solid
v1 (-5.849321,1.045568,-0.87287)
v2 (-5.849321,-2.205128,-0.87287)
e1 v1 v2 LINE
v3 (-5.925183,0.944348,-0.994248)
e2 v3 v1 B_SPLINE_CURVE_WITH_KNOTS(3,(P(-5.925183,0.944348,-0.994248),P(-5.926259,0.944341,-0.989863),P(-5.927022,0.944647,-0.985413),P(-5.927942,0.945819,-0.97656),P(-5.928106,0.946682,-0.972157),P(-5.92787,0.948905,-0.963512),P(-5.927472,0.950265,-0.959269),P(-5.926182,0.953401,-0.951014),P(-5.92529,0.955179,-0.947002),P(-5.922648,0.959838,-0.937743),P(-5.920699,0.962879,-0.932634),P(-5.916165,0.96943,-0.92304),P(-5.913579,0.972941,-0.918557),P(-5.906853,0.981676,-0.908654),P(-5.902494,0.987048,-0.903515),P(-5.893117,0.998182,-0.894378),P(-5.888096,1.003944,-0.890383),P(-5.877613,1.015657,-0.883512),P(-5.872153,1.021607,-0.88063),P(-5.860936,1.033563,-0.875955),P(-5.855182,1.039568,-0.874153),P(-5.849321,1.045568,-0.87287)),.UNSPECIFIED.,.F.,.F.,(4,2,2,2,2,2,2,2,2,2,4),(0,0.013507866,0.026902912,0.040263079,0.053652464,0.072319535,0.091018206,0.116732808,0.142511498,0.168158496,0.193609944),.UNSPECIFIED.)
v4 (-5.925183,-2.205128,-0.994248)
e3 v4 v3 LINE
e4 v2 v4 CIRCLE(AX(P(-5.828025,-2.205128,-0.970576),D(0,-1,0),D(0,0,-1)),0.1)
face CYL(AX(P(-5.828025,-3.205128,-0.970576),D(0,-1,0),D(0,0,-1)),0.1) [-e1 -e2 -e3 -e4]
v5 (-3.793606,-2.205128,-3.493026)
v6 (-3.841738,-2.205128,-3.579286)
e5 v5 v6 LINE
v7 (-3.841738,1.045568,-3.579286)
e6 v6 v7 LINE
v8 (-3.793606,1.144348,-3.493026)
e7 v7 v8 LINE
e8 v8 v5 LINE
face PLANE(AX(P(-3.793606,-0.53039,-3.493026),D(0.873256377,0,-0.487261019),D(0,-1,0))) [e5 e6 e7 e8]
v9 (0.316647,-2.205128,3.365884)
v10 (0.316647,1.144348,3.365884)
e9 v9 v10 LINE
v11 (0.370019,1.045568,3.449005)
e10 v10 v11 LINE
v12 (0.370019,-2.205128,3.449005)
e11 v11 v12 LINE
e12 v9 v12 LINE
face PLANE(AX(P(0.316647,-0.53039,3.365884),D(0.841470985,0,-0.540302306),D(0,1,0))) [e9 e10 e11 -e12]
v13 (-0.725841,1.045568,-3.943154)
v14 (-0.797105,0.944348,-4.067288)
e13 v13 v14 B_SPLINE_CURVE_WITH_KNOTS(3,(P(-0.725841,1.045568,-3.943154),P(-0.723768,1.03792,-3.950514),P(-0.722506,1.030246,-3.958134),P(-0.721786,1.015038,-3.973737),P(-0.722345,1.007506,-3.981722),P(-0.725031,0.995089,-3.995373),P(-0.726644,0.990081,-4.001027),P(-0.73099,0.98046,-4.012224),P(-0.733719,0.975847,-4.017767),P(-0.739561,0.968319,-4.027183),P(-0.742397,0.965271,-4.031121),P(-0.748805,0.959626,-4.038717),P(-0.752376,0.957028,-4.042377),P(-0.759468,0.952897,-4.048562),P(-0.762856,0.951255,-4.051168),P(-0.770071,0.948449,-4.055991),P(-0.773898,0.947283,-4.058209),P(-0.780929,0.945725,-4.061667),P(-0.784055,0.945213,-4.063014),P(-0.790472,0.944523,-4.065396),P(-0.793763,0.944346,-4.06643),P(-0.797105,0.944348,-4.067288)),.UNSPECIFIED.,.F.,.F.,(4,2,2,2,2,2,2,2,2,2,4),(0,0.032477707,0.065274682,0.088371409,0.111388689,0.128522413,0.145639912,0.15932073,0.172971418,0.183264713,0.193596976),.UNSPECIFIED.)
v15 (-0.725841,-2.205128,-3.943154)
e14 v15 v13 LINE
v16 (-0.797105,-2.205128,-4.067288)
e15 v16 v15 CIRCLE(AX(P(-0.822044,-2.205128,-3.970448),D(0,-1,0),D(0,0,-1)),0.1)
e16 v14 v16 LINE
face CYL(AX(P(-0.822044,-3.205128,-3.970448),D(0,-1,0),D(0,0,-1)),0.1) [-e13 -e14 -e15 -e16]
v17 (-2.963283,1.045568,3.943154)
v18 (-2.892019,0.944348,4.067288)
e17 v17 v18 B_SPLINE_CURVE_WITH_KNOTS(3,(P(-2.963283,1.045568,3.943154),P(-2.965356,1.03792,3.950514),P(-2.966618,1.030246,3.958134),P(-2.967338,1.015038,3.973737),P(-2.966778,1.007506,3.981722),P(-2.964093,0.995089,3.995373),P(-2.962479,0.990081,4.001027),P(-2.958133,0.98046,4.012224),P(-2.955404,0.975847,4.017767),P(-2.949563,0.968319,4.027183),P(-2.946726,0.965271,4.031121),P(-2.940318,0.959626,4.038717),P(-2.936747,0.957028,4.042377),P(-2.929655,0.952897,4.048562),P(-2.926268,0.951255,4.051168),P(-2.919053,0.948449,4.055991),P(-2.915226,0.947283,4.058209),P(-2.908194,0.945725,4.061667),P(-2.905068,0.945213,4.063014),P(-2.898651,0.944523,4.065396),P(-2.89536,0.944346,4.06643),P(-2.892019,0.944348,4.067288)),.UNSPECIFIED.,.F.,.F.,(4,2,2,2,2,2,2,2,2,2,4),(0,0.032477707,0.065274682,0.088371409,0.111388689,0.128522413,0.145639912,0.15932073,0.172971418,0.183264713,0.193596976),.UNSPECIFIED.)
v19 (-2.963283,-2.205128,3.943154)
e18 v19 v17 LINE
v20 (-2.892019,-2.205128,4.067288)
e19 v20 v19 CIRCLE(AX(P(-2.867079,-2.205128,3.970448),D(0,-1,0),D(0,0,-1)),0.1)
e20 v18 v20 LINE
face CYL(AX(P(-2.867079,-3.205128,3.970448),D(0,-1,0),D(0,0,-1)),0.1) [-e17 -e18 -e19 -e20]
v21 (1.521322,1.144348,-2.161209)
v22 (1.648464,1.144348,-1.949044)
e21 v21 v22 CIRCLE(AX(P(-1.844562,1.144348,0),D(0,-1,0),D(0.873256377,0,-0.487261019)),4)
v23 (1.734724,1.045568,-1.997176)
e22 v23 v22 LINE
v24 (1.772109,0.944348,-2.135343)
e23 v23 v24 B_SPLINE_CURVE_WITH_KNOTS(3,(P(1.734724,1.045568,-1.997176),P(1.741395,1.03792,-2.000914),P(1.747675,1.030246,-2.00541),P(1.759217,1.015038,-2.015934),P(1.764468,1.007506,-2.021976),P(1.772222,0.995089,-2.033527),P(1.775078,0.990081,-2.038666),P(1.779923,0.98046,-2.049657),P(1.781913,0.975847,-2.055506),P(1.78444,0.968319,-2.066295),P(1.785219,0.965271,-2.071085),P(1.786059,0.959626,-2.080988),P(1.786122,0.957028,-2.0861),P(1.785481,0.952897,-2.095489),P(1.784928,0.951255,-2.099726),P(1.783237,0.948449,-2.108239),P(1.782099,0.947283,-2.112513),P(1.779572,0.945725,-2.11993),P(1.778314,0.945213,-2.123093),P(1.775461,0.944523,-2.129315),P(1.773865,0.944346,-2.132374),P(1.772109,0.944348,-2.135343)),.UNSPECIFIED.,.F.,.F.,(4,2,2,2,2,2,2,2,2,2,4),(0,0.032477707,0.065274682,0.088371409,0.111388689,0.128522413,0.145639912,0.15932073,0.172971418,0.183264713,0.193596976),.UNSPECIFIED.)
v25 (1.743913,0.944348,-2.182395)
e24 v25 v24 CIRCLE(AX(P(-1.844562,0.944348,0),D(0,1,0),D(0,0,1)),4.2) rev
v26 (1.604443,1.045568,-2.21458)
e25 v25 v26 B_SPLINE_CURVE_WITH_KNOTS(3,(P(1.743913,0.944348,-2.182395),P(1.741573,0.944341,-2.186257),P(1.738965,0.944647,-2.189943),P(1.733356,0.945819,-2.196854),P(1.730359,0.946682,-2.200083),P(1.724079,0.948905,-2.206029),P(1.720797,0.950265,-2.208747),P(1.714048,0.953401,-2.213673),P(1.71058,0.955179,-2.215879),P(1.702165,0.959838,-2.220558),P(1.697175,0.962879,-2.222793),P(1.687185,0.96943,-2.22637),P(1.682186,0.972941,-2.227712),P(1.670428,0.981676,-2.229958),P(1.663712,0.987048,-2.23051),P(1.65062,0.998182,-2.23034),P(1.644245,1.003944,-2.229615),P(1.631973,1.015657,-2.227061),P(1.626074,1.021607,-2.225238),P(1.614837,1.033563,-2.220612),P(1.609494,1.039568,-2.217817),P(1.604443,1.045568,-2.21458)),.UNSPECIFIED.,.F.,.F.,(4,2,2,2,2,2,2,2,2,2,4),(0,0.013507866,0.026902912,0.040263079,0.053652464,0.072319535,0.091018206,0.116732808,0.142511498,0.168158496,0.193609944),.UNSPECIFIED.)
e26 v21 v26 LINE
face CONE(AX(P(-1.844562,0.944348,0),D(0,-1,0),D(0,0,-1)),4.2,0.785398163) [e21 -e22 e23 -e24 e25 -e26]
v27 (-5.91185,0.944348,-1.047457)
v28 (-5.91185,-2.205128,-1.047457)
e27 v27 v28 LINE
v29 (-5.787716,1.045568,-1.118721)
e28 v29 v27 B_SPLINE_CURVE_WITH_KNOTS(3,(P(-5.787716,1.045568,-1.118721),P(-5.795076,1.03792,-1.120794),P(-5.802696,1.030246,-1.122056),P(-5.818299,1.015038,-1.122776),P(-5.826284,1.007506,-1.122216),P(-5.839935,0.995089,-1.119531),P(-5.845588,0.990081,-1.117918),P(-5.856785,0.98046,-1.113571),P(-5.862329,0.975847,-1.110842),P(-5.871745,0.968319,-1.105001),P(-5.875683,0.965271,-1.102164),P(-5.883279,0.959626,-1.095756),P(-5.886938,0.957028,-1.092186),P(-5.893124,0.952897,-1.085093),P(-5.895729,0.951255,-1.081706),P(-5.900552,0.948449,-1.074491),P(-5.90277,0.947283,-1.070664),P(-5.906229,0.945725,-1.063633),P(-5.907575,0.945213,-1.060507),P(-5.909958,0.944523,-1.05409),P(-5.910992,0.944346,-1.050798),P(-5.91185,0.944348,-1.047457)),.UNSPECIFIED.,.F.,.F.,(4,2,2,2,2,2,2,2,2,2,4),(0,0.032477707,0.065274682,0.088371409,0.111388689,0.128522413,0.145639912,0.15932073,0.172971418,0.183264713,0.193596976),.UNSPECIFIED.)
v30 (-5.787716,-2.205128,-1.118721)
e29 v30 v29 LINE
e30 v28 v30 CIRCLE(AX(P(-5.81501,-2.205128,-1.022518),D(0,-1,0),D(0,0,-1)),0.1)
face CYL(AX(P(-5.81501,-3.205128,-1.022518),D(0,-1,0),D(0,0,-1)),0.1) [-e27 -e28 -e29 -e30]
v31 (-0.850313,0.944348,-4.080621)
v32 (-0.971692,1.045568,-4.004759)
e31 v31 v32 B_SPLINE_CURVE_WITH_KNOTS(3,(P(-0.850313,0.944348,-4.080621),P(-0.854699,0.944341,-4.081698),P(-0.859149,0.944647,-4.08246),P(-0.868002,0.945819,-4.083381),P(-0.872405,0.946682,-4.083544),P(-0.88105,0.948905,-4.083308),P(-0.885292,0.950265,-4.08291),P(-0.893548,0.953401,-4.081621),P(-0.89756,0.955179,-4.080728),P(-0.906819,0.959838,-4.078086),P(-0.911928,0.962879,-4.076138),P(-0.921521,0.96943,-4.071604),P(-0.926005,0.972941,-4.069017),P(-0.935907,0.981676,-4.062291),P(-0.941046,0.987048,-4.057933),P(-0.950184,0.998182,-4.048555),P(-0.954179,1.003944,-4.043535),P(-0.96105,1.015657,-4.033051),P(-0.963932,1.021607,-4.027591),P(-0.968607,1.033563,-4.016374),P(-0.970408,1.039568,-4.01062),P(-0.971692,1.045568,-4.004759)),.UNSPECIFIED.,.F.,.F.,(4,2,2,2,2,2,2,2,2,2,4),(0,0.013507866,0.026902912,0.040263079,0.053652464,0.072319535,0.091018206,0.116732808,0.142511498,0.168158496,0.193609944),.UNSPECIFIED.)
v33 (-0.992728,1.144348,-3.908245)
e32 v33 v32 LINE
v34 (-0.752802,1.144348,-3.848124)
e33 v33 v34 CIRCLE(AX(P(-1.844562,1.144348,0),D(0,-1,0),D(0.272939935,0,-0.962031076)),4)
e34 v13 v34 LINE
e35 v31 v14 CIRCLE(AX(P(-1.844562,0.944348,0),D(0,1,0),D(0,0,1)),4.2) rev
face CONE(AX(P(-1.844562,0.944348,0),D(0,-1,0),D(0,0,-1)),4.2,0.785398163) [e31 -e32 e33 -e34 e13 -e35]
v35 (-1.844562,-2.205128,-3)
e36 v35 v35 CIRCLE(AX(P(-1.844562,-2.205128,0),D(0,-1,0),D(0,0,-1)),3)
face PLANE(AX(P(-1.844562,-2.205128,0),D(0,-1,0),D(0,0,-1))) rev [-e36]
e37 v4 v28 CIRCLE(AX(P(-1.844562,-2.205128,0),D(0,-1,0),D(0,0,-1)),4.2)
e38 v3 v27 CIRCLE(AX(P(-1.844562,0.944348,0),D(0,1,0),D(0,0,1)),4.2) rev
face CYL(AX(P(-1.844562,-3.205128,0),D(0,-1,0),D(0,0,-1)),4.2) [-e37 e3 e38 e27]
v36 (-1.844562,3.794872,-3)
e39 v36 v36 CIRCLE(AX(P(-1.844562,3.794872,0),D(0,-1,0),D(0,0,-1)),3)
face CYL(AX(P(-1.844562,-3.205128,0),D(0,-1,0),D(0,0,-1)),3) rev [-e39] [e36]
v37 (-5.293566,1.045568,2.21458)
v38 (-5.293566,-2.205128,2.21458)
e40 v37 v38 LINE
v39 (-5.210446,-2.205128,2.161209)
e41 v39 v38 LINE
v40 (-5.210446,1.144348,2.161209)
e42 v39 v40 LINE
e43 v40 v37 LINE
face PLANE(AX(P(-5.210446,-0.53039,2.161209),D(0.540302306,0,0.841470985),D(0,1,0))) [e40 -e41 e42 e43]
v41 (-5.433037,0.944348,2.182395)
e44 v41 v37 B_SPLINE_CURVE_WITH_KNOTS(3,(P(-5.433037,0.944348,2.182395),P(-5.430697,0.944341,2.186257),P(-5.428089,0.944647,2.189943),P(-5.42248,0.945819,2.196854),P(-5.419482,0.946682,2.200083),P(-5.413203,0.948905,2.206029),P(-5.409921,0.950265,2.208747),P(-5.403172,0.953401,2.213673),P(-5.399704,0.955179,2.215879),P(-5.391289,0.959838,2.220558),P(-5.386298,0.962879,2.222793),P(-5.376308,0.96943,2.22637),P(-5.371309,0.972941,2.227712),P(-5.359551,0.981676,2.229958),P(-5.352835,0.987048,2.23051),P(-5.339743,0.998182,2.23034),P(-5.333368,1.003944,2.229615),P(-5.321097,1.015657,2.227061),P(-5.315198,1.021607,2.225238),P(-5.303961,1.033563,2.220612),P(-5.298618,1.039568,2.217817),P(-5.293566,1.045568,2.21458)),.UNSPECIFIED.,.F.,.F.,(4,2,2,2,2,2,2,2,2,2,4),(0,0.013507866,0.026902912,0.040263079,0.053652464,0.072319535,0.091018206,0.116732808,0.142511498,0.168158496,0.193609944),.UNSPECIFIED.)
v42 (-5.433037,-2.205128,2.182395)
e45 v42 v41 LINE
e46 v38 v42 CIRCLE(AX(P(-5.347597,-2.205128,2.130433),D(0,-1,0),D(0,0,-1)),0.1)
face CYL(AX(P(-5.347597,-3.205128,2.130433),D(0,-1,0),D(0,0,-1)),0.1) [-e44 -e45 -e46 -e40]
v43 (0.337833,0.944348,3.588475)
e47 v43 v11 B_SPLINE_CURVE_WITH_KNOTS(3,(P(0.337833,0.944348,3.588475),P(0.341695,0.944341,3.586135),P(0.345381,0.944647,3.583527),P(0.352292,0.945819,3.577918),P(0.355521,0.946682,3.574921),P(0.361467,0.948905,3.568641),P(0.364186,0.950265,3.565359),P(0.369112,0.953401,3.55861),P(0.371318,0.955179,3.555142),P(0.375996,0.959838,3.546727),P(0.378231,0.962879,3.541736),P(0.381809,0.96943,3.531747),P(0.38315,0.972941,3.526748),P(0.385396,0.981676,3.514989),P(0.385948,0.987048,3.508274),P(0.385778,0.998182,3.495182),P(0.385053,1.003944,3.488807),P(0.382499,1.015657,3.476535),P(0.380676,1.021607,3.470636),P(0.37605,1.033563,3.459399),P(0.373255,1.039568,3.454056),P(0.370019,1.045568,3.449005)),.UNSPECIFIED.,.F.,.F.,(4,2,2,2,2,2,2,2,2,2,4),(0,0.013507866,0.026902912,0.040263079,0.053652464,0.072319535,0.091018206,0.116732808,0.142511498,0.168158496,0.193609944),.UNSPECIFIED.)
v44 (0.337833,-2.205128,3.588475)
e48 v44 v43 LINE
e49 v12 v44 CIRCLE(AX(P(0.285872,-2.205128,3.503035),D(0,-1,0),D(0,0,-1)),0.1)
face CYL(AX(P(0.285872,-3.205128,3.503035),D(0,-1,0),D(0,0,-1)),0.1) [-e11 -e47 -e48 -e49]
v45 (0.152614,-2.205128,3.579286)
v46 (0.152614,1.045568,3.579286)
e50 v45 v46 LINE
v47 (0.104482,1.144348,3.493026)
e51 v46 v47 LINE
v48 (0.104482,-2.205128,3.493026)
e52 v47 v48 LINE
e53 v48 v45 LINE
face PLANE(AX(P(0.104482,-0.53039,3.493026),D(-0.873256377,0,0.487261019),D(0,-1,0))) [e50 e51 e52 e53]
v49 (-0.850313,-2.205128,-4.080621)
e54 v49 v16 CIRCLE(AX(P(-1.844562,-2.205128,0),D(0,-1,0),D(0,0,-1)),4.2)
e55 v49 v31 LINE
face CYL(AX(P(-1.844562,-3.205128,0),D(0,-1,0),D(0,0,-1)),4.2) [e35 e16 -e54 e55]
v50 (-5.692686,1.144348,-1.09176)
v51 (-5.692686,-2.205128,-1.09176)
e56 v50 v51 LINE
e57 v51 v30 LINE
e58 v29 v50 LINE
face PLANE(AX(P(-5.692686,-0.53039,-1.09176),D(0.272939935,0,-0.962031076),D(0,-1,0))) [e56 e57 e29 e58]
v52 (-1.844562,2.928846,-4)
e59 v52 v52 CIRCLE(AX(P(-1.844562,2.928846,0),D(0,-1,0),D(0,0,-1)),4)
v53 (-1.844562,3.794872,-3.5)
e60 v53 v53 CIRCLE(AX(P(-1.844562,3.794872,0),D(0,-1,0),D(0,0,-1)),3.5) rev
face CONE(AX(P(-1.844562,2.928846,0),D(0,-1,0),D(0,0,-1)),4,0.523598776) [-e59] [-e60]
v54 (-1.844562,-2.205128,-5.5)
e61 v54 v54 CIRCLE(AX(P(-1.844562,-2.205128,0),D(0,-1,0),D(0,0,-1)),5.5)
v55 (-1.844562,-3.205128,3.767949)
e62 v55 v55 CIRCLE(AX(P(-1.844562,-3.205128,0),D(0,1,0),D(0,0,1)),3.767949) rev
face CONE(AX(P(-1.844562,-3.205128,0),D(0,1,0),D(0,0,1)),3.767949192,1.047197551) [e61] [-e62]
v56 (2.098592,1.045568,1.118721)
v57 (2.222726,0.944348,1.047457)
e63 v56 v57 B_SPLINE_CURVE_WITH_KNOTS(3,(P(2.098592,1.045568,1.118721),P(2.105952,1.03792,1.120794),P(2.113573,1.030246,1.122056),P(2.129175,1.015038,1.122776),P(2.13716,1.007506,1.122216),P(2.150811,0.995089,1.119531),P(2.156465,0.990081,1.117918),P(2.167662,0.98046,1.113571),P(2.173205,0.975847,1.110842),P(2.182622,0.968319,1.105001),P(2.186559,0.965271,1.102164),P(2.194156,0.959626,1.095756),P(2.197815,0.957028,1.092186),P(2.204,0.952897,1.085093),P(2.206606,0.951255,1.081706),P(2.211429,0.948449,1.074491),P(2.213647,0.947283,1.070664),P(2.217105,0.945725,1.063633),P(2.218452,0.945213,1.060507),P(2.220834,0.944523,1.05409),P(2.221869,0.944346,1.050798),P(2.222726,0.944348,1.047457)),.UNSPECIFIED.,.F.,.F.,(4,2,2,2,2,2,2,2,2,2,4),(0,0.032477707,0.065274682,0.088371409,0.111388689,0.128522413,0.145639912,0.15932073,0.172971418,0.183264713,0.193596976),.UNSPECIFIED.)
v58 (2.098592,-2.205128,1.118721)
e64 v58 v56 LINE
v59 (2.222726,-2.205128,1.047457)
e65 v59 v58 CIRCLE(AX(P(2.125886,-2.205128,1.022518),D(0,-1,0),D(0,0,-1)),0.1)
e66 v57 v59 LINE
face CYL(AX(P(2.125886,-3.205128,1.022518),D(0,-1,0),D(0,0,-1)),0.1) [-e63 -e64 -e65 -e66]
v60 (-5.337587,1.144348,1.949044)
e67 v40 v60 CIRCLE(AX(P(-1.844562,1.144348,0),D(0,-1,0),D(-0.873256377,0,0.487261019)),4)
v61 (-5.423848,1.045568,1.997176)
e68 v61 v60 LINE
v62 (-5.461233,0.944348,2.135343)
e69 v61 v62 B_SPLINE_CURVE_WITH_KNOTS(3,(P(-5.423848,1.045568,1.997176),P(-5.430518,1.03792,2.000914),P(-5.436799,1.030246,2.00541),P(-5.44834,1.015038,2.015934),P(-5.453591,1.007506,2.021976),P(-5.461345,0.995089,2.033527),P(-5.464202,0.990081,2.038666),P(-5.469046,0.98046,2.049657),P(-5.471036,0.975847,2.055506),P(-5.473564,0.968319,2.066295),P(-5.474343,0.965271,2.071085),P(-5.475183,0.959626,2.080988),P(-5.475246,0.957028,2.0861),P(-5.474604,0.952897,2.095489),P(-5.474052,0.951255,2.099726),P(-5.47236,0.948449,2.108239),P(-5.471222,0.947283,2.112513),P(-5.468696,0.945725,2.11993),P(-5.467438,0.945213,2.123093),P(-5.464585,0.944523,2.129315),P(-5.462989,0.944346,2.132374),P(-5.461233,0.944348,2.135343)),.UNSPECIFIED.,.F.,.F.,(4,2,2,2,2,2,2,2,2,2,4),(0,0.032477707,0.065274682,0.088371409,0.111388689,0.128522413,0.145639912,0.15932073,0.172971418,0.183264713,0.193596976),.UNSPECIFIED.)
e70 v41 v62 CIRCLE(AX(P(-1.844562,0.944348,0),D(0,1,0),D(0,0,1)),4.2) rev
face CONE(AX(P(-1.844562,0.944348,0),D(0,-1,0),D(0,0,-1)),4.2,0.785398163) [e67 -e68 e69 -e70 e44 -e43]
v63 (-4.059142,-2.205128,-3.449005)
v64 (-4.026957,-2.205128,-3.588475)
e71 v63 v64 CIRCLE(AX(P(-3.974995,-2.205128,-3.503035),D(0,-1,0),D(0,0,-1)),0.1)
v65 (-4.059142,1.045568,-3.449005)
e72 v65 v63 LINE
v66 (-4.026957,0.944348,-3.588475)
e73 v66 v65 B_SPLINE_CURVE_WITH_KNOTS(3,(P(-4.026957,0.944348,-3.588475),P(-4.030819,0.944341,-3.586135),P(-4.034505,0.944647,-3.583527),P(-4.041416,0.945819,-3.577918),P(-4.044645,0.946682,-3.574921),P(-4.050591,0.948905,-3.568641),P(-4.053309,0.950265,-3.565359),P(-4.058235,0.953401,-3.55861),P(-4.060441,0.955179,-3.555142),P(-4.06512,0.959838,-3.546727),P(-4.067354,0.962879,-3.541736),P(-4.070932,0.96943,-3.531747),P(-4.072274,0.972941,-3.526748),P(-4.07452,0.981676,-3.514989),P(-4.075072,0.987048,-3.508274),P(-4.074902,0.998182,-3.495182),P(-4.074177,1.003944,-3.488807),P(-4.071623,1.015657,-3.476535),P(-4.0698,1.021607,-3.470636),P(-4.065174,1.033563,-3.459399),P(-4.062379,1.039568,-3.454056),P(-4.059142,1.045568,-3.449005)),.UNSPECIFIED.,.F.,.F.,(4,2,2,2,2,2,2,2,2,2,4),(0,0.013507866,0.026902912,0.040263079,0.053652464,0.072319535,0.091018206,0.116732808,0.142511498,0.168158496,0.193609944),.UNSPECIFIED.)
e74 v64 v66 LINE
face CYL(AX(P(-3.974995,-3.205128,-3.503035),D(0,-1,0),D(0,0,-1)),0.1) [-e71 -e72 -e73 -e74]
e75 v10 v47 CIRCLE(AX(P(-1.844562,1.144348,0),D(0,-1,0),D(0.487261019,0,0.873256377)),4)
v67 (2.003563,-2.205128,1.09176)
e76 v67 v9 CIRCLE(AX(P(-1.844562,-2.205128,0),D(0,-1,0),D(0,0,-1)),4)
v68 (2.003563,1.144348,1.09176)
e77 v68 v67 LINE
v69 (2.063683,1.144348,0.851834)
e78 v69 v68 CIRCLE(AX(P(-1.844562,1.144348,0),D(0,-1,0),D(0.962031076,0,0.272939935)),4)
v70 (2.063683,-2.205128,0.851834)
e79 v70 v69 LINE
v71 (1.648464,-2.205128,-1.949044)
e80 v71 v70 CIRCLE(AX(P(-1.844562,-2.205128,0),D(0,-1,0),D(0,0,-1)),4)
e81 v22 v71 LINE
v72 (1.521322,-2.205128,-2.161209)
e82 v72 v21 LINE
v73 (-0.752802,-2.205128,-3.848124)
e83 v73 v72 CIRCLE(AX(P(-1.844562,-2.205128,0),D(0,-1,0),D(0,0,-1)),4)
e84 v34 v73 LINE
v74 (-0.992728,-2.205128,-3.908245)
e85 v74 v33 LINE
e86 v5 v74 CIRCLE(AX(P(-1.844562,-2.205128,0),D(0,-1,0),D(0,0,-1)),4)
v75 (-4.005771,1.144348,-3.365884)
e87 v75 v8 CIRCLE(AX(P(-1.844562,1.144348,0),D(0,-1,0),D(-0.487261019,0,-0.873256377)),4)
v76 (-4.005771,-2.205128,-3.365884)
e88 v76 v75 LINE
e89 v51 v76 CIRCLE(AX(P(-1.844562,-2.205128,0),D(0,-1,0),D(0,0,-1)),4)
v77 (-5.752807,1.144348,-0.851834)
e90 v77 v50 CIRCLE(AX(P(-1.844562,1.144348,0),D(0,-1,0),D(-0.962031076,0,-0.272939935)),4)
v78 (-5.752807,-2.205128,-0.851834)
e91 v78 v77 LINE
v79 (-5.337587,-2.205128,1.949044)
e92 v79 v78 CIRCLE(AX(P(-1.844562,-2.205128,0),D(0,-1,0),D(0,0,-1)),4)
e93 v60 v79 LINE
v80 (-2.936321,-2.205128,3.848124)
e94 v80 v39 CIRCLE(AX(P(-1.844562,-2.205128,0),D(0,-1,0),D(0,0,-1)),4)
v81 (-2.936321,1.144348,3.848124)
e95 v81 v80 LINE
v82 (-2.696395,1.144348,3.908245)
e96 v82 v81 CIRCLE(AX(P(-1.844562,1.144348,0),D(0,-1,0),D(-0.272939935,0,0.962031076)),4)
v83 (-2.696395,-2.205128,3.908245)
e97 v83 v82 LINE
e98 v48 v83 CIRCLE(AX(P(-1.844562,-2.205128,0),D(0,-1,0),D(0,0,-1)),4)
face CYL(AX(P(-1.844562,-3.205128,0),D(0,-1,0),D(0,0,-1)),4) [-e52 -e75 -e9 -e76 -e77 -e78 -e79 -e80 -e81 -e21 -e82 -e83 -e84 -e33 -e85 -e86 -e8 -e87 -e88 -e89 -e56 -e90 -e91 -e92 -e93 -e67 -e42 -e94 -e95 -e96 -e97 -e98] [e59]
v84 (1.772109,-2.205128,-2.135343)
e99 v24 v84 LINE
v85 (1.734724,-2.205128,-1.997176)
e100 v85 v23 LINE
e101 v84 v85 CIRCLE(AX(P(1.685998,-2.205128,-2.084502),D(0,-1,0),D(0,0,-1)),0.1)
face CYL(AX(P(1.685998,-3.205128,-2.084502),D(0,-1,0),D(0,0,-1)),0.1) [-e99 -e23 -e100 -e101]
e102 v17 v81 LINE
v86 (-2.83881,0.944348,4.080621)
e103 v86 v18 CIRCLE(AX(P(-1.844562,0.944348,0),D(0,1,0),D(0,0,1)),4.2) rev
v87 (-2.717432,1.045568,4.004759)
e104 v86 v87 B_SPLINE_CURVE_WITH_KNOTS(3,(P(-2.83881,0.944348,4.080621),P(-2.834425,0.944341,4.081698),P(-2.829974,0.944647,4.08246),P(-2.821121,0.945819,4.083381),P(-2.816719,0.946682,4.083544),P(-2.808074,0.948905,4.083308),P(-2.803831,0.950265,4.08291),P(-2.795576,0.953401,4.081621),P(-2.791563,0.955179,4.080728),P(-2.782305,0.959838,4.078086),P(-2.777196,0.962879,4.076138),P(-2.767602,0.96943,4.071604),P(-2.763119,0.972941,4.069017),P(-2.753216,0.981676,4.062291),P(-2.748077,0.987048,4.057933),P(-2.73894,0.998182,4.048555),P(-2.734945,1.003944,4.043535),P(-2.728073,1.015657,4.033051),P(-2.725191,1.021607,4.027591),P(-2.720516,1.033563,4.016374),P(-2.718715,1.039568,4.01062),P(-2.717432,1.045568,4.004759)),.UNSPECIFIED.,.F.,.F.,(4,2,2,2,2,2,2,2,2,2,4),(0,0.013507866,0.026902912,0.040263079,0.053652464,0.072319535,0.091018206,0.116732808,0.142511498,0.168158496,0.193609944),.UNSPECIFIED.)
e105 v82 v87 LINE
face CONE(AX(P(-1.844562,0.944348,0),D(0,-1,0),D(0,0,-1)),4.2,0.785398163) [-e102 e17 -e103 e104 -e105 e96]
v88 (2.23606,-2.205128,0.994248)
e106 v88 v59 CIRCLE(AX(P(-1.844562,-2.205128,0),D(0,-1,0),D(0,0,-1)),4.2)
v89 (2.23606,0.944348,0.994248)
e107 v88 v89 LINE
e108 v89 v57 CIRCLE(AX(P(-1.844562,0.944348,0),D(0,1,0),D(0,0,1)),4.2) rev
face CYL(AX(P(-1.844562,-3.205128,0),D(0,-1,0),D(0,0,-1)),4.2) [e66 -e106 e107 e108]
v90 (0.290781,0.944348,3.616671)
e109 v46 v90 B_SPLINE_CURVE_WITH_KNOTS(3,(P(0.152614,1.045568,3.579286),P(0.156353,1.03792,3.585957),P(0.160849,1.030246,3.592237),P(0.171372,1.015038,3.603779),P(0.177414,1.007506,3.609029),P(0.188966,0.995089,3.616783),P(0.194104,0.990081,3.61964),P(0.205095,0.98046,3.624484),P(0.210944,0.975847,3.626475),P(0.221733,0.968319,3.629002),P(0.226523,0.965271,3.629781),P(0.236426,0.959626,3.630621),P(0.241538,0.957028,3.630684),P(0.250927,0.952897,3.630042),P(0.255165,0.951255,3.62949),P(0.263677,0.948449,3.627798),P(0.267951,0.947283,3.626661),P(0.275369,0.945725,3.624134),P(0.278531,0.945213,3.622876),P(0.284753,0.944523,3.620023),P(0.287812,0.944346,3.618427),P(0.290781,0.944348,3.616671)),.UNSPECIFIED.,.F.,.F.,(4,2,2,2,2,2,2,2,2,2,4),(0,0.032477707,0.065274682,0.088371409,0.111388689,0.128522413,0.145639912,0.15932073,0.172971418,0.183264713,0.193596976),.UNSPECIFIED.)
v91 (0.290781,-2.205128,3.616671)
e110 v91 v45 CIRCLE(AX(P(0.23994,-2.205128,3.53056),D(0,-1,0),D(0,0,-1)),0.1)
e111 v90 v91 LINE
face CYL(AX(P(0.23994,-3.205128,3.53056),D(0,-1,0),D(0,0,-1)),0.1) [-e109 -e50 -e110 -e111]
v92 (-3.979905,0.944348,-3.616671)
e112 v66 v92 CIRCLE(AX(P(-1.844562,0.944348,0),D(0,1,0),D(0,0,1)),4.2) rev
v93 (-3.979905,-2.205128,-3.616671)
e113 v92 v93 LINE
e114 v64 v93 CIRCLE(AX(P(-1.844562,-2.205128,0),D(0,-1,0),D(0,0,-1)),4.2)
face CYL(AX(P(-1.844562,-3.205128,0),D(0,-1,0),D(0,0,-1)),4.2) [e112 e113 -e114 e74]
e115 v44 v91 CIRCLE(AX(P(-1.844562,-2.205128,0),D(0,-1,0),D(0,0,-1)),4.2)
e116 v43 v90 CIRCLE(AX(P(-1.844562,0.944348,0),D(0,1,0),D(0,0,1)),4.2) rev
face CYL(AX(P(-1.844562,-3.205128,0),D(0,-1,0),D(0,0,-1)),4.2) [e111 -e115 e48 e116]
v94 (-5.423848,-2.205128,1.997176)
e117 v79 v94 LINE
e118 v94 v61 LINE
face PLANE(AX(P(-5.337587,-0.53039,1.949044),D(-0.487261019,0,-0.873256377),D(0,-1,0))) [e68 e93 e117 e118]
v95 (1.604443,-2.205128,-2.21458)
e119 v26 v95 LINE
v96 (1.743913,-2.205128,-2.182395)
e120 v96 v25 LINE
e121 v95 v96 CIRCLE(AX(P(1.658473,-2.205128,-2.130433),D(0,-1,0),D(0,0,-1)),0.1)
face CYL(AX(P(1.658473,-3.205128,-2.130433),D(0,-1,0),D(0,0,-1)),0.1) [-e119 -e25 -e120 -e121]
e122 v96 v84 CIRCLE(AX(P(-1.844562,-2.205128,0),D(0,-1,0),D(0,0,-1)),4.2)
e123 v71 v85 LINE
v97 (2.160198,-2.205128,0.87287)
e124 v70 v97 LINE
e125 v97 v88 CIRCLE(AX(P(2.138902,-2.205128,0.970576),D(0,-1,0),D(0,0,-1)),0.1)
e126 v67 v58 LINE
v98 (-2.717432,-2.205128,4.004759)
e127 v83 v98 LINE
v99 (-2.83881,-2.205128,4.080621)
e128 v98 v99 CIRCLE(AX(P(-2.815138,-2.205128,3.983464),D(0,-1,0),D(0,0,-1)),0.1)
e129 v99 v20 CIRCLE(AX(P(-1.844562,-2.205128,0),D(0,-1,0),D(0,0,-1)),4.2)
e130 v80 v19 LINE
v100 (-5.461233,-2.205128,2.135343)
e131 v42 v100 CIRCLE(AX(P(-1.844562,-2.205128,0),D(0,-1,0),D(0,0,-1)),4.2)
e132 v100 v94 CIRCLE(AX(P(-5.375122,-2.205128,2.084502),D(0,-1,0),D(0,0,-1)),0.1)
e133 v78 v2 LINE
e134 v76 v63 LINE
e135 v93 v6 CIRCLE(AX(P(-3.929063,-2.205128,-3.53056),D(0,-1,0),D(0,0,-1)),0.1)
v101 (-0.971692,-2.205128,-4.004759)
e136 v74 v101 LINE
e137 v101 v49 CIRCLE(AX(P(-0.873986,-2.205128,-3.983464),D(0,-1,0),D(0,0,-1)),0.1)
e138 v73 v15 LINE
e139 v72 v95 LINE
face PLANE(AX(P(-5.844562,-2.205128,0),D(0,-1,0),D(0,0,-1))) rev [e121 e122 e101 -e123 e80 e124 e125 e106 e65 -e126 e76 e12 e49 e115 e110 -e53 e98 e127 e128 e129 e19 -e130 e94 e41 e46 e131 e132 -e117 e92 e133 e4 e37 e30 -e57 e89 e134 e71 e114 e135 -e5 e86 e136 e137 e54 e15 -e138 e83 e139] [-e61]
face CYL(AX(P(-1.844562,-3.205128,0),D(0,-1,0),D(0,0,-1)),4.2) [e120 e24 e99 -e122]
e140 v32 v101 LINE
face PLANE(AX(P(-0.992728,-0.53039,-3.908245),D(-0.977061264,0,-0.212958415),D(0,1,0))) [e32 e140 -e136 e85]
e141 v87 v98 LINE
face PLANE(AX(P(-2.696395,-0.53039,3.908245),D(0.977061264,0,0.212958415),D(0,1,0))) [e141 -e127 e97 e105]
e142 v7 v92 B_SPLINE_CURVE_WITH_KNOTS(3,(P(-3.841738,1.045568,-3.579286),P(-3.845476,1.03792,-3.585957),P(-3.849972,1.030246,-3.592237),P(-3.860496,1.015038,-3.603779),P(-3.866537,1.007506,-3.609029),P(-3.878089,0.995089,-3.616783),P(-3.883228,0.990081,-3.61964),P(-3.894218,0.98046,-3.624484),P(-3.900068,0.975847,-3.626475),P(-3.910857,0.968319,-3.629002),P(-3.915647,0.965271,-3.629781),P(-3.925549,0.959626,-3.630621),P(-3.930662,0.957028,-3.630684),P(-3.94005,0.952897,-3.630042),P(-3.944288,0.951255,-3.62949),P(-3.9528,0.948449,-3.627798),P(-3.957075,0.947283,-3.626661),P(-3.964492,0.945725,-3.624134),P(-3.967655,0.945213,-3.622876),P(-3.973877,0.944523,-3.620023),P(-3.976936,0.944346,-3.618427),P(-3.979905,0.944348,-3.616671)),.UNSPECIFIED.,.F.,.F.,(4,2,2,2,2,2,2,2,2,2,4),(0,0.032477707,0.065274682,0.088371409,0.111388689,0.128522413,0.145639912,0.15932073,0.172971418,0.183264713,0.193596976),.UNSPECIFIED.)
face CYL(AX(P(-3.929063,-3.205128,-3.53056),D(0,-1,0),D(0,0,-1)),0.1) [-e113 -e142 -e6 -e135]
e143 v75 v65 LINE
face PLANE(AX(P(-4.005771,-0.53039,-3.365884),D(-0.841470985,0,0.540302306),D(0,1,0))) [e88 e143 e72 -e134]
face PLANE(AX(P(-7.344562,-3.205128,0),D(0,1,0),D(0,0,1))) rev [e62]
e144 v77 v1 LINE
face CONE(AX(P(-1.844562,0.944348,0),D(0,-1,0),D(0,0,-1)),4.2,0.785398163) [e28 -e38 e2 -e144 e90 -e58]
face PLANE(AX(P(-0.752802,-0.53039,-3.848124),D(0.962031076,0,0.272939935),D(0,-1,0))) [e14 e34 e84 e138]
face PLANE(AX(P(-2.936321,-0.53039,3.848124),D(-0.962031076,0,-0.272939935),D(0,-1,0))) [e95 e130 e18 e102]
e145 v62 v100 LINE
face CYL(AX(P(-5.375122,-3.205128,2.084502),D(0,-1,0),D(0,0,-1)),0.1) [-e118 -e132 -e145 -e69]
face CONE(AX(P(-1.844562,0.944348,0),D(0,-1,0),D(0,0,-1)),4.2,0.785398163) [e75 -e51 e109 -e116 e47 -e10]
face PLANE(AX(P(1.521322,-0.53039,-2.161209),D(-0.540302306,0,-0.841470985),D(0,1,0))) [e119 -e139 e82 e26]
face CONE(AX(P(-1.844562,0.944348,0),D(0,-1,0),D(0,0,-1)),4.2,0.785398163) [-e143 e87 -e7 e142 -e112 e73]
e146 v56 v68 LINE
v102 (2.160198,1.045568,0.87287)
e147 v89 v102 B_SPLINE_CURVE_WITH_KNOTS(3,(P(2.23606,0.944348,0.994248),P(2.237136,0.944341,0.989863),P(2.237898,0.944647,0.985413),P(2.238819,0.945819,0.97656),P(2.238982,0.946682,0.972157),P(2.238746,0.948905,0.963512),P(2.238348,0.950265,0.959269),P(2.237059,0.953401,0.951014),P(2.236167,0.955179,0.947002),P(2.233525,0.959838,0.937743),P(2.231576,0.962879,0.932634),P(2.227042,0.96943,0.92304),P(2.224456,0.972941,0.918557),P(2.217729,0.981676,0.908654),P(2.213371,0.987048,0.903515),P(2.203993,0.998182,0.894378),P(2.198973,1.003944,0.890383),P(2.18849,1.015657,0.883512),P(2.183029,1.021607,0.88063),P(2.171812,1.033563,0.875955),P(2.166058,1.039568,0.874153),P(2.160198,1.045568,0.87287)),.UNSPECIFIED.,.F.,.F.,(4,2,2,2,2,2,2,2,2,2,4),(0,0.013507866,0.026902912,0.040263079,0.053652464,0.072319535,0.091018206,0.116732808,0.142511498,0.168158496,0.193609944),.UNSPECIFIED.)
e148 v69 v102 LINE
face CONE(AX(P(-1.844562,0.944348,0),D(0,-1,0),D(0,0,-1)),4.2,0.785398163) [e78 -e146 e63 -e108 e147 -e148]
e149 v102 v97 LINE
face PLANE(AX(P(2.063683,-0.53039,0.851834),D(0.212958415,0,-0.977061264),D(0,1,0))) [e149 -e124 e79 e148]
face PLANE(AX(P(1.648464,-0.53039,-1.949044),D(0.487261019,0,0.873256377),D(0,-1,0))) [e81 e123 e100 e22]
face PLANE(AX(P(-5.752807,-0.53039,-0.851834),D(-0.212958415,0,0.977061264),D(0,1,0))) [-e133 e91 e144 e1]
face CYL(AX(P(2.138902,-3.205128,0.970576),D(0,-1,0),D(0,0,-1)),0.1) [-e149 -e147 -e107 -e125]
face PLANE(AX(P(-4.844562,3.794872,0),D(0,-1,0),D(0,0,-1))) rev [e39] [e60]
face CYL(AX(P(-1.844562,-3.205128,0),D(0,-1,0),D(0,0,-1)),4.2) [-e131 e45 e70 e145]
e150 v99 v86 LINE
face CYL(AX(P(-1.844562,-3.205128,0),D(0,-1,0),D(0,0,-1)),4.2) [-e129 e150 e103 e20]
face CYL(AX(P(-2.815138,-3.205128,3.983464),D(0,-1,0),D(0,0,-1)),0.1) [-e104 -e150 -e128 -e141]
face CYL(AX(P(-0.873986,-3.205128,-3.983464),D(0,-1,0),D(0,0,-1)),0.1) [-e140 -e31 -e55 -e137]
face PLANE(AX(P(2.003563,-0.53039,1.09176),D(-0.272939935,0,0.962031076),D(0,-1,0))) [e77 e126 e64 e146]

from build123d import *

# Parameters (mm, degrees)
CHANFREIN2_SIZE              = 1
CHANFREIN2_SIZE_2            = 1.732050808
CHANFREIN3_SIZE              = 0.5
CHANFREIN3_SIZE2             = 0.866025404
ENROULEMENT2_SECTION_W       = 0.2
ENROULEMENT2_SECTION_H       = 3.3494767
ENROULEMENT2_ANGLE           = 3.543505781
R_P_TITION_CIRCULAIRE3_COUNT = 8
CHANFREIN4_SIZE              = 0.2
CONG_1_R                     = 0.1


# Some blends are built 0.0001 mm under size
with BuildPart() as part:
    # Esquisse1 → Révolution1 (revolve)
    with BuildSketch(Plane.XY, mode=Mode.PRIVATE) as r_volution1_sk:
        Polygon((-5.844561756, 3.794871795), (-5.844561756, -2.205128205), (-7.344561756, -2.205128205), (-7.344561756, -3.205128205), (-1.844561756, -3.205128205), (-1.844561756, -2.205128205), (-4.844561756, -2.205128205), (-4.844561756, 3.794871795), align=None)
    revolve(r_volution1_sk.sketch.rotate(Axis((-1.844561756, -3.205128205, 0), (0, 1, 0)), 270), axis=Axis((-1.844561756, -3.205128205, 0), (0, 1, 0)))

    # Chanfrein2
    # the kernel refuses this chamfer: 1.732050808, 1 mm, written as the material it takes off along each edge
    with BuildSketch(Plane(origin=(-1.844561756, -3.205128205, 0), x_dir=(0, 0, -1), z_dir=(1, 0, 0))) as chanfrein2_piece_1:
        Polygon((5.5, CHANFREIN2_SIZE), (5.5 - CHANFREIN2_SIZE_2, 0), (5.5, 0), align=None)
    revolve(axis=Axis((-1.844561756, -3.205128205, 0), (0, 1, 0)), mode=Mode.SUBTRACT)

    # Chanfrein3
    chanfrein3_edges = [part.edges().sort_by_distance(p)[0] for p in [
        (-1.844561756, 3.794871795, 4),
    ]]
    chanfrein3_side = [part.faces().sort_by_distance(p)[0] for p in [
        (-1.844561756, 3.794871795, 3.113137085),
    ]]
    chamfer(chanfrein3_edges, length=CHANFREIN3_SIZE, length2=CHANFREIN3_SIZE2, reference=chanfrein3_side[0])

    # Enroulement2 section (on wrap section) → Enroulement2 (revolve)
    with BuildSketch(Plane(origin=(-1.844561756, 3.794871795, 0), x_dir=(-0.8414709848078965, 0, 0.5403023058681398), z_dir=(0.5403023058681398, 0, 0.8414709848078965))):
        with Locations((4.1, 4.32526165)):
            Rectangle(ENROULEMENT2_SECTION_W, ENROULEMENT2_SECTION_H)
    enroulement2 = revolve(axis=Axis((-1.844561756, 3.794871795, 0), (0, -1, 0)), revolution_arc=ENROULEMENT2_ANGLE)

    # Répétition circulaire3: Enroulement2 ×8 about axis
    r_p_tition_circulaire3_axis = Axis((-1.844561756, 0, 0), (0, 1, 0))
    for i in range(1, R_P_TITION_CIRCULAIRE3_COUNT):
        add(enroulement2.rotate(r_p_tition_circulaire3_axis, i * 360 / R_P_TITION_CIRCULAIRE3_COUNT))

    # Chanfrein4
    chanfrein4_edges = [part.edges().sort_by_distance(p)[0] for p in [
        (-2.865436347, 1.144348495, 4.074041614),
        (0.31435335, 1.144348495, 3.602649798),
        (2.229479857, 1.144348495, 1.020874591),
        (1.758088041, 1.144348495, -2.158915106),
        (-0.823687166, 1.144348495, -4.074041614),
        (-4.003476862, 1.144348495, -3.602649798),
        (-5.91860337, 1.144348495, -1.020874591),
        (-5.447211554, 1.144348495, 2.158915106),
    ]]
    chamfer(chanfrein4_edges, length=CHANFREIN4_SIZE - 0.0001)  # a hair under: the kernel refuses the full size

    # Congé1
    cong_1_edges = [part.edges().sort_by_distance(p)[0] for p in [
        (-2.7389871, -0.630339855, 4.103657308),
        (-2.990909484, -0.630339855, 4.04053052),
        (0.201934522, -0.630339855, 3.667676783),
        (2.195968764, -0.630339855, 1.146347728),
        (1.823115026, -0.630339855, -2.046496279),
        (-0.698214029, -0.630339855, -4.04053052),
        (-3.891058035, -0.630339855, -3.667676783),
        (-5.885092277, -0.630339855, -1.146347728),
        (-5.512238539, -0.630339855, 2.046496279),
        (-5.378739893, -0.630339855, 2.269269685),
        (-5.948219065, -0.630339855, -0.894425344),
        (-4.113831441, -0.630339855, -3.534178136),
        (-0.950136413, -0.630339855, -4.103657308),
        (1.68961638, -0.630339855, -2.269269685),
        (2.259095552, -0.630339855, 0.894425344),
        (0.424707928, -0.630339855, 3.534178136),
    ]]
    fillet(cong_1_edges, radius=CONG_1_R)


solid = part.part
